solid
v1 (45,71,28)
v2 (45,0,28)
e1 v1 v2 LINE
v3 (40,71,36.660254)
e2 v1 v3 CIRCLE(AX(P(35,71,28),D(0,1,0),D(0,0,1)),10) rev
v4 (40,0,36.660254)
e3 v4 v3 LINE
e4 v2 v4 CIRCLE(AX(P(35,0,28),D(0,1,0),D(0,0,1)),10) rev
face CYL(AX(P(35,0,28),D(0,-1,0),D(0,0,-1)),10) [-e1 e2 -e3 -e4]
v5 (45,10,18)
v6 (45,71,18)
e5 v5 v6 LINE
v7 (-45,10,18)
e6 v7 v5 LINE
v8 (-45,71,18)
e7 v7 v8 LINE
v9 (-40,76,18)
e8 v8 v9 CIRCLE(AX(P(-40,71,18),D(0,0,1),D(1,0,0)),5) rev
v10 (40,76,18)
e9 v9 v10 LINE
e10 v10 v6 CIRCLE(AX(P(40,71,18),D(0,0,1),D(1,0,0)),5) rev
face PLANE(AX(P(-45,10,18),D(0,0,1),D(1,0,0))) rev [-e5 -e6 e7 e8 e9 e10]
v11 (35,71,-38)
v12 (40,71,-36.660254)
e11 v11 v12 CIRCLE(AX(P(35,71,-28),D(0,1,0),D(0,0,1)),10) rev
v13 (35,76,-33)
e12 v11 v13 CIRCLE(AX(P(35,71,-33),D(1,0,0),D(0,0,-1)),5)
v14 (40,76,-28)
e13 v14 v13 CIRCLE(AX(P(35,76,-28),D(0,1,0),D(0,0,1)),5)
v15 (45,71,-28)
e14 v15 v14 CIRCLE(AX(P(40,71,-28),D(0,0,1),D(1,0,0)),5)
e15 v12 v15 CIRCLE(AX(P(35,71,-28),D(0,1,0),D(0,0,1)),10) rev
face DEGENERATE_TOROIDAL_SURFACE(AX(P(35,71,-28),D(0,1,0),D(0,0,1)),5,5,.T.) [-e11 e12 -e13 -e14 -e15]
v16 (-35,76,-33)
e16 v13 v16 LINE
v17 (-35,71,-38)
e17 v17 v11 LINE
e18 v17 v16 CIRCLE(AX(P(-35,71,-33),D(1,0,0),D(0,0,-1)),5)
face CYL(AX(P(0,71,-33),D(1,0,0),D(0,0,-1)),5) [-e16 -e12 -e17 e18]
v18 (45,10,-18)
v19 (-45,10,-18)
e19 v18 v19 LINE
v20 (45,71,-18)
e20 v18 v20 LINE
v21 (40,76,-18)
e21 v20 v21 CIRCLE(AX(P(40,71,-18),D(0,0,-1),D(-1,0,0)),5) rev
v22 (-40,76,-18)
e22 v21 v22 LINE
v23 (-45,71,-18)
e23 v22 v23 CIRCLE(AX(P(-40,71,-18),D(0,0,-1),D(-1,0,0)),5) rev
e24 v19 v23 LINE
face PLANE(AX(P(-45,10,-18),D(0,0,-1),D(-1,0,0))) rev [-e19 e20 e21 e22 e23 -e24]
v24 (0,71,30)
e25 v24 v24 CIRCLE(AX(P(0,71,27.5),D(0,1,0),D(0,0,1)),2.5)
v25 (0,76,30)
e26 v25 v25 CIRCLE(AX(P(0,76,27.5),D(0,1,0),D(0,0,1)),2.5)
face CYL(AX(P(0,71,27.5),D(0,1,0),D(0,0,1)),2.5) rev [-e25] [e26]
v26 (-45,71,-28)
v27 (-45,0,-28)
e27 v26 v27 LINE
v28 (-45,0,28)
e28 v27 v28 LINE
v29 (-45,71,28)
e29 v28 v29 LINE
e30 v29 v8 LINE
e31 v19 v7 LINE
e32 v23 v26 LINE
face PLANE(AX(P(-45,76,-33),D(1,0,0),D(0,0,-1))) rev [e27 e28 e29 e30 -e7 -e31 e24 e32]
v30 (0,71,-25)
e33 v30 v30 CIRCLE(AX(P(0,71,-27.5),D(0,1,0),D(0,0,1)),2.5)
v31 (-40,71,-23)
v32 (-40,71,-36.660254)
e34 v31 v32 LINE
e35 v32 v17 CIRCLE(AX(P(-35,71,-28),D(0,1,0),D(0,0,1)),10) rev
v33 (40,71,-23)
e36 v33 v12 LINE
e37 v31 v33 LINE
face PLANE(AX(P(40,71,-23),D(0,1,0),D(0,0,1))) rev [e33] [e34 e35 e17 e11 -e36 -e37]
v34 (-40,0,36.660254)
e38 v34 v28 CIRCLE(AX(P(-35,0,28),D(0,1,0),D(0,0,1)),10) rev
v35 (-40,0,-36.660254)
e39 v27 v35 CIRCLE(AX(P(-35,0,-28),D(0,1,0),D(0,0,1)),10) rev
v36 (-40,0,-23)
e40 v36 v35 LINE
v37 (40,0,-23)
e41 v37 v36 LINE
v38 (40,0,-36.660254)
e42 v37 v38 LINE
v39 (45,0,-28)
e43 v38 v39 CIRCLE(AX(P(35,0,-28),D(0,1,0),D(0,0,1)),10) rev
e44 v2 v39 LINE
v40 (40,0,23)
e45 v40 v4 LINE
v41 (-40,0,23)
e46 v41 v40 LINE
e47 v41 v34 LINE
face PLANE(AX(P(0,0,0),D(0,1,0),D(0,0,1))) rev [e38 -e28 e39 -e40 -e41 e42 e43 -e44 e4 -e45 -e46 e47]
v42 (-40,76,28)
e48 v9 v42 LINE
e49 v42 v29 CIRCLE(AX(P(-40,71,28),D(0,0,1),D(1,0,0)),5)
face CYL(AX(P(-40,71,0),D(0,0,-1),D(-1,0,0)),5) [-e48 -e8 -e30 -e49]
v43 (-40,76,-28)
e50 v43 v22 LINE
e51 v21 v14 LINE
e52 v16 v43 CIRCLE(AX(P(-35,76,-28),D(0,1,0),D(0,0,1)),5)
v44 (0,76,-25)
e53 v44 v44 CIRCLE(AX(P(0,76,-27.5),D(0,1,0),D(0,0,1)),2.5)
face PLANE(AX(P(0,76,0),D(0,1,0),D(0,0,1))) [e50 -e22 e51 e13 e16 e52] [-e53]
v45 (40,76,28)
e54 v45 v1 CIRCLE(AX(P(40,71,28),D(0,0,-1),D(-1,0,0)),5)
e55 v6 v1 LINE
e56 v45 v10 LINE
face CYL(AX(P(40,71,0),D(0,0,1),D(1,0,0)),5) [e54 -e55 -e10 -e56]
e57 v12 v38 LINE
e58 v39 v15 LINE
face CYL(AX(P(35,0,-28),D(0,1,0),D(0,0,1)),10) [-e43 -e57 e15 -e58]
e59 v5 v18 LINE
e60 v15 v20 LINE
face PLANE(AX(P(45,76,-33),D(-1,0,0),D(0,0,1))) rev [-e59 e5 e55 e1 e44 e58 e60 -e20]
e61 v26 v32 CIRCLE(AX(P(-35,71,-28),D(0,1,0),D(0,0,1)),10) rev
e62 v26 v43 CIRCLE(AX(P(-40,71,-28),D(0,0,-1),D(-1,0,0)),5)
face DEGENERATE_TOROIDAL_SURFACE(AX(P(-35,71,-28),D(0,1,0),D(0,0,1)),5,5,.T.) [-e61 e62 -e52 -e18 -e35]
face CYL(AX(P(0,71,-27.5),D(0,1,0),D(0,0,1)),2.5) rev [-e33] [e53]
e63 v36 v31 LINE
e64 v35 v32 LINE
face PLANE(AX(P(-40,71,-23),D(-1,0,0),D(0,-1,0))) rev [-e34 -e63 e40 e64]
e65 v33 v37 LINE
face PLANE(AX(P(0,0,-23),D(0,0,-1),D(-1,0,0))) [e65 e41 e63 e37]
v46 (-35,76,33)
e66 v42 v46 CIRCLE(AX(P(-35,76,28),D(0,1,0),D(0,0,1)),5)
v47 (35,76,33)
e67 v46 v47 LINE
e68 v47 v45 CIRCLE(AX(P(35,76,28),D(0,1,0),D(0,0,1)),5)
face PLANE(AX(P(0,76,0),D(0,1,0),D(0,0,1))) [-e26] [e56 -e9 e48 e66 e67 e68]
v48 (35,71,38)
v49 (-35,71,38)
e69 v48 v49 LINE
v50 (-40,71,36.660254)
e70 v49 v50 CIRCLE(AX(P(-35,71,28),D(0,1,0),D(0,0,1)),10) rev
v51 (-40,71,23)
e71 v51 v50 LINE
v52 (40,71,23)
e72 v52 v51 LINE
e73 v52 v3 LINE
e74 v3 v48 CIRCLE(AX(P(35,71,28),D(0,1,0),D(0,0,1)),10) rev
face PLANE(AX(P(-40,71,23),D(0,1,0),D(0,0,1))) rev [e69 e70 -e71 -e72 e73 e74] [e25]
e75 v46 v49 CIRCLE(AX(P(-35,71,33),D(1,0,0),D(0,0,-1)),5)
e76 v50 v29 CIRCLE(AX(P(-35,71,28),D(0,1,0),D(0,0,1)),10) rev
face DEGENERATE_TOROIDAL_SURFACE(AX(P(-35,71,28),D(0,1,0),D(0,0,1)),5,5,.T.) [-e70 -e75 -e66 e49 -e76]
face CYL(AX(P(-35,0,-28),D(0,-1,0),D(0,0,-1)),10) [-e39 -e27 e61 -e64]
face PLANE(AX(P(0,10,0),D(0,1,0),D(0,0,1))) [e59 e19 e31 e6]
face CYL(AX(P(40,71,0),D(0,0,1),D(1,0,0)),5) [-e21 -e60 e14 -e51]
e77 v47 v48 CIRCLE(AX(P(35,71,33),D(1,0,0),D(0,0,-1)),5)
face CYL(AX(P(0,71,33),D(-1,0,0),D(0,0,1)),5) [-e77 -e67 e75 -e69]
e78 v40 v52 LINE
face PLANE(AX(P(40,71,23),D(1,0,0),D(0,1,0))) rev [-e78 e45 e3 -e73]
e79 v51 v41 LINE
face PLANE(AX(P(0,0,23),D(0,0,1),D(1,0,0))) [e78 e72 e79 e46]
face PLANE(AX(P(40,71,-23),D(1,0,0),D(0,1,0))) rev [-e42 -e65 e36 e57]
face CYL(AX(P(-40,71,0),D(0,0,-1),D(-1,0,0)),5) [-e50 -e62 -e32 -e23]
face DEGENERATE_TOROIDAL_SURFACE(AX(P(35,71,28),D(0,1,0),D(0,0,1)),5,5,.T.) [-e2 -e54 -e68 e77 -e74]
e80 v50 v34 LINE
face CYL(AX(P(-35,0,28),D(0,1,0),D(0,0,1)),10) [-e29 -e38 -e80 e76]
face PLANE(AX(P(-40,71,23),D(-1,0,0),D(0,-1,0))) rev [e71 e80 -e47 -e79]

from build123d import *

# Parameters (mm, degrees)
SKETCH1_W           = 90
SKETCH1_H           = 66
BOSS_EXTRUDE1_DEPTH = 76
SKETCH2_W           = 90
SKETCH2_H           = 36
CUT_EXTRUDE1_DEPTH  = 66
SKETCH3_W           = 90
SKETCH3_H           = 76
BOSS_EXTRUDE4_DEPTH = 5
SKETCH11_W          = 90
SKETCH11_H          = 76
BOSS_EXTRUDE5_DEPTH = 5
SKETCH12_W          = 80
SKETCH12_H          = 71
CUT_EXTRUDE9_DEPTH  = 15
SKETCH13_W          = 80
SKETCH13_H          = 71
CUT_EXTRUDE10_DEPTH = 15
SKETCH14_R          = 2.5
CUT_EXTRUDE11_DEPTH = 5
SKETCH15_R          = 2.5
CUT_EXTRUDE12_DEPTH = 5
FILLET1_R           = 10
FILLET2_R           = 5


with BuildPart() as part:
    # Sketch1 → Boss-Extrude1 (new body)
    with BuildSketch(Plane(origin=(0, 0, 0), x_dir=(1, 0, 0), z_dir=(0, 1, 0))):
        Rectangle(SKETCH1_W, SKETCH1_H)
    extrude(amount=BOSS_EXTRUDE1_DEPTH)

    # Sketch2 → Cut-Extrude1 (cut)
    with BuildSketch(Plane(origin=(0, 76, 0), x_dir=(1, 0, 0), z_dir=(0, 1, 0))):
        Rectangle(SKETCH2_W, SKETCH2_H)
    extrude(amount=-CUT_EXTRUDE1_DEPTH, mode=Mode.SUBTRACT)

    # Sketch3 → Boss-Extrude4 (add)
    with BuildSketch(Plane(origin=(0, 0, -33), x_dir=(-1, 0, 0), z_dir=(0, 0, -1))):
        with Locations((0, 38)):
            Rectangle(SKETCH3_W, SKETCH3_H)
    extrude(amount=BOSS_EXTRUDE4_DEPTH)

    # Sketch11 → Boss-Extrude5 (add)
    with BuildSketch(Plane.XY.offset(33)):
        with Locations((0, 38)):
            Rectangle(SKETCH11_W, SKETCH11_H)
    extrude(amount=BOSS_EXTRUDE5_DEPTH)

    # Sketch12 → Cut-Extrude9 (cut)
    with BuildSketch(Plane.XY.offset(38)):
        with Locations((0, 35.5)):
            Rectangle(SKETCH12_W, SKETCH12_H)
    extrude(amount=-CUT_EXTRUDE9_DEPTH, mode=Mode.SUBTRACT)

    # Sketch13 → Cut-Extrude10 (cut)
    with BuildSketch(Plane(origin=(0, 0, -38), x_dir=(-1, 0, 0), z_dir=(0, 0, -1))):
        with Locations((0, 35.5)):
            Rectangle(SKETCH13_W, SKETCH13_H)
    extrude(amount=-CUT_EXTRUDE10_DEPTH, mode=Mode.SUBTRACT)

    # Sketch14 → Cut-Extrude11 (cut)
    with BuildSketch(Plane(origin=(0, 76, 0), x_dir=(1, 0, 0), z_dir=(0, 1, 0))):
        with Locations(Location((0, 27.5, 0), (0, 0, 270))):
            Circle(SKETCH14_R)
    extrude(amount=-CUT_EXTRUDE11_DEPTH, mode=Mode.SUBTRACT)

    # Sketch15 → Cut-Extrude12 (cut)
    with BuildSketch(Plane(origin=(0, 76, 0), x_dir=(1, 0, 0), z_dir=(0, 1, 0))):
        with Locations(Location((0, -27.5, 0), (0, 0, 270))):
            Circle(SKETCH15_R)
    extrude(amount=-CUT_EXTRUDE12_DEPTH, mode=Mode.SUBTRACT)

    # Fillet1
    fillet1_edges = [part.edges().sort_by_distance(p)[0] for p in [
        (-45, 38, -38),
        (45, 38, -38),
        (-45, 38, 38),
        (45, 38, 38),
    ]]
    fillet(fillet1_edges, radius=FILLET1_R)

    # Fillet2
    fillet2_edges = [part.edges().sort_by_distance(p)[0] for p in [
        (45, 76, -23),
        (42.071067812, 76, -35.071067812),
        (-42.071067812, 76, -35.071067812),
        (45, 76, 23),
        (42.071067812, 76, 35.071067812),
        (0, 76, 38),
        (-42.071067812, 76, 35.071067812),
        (0, 76, -38),
        (-45, 76, -23),
        (-45, 76, 23),
    ]]
    fillet(fillet2_edges, radius=FILLET2_R - 0.0001)  # a hair under: the kernel refuses the full size


solid = part.part
